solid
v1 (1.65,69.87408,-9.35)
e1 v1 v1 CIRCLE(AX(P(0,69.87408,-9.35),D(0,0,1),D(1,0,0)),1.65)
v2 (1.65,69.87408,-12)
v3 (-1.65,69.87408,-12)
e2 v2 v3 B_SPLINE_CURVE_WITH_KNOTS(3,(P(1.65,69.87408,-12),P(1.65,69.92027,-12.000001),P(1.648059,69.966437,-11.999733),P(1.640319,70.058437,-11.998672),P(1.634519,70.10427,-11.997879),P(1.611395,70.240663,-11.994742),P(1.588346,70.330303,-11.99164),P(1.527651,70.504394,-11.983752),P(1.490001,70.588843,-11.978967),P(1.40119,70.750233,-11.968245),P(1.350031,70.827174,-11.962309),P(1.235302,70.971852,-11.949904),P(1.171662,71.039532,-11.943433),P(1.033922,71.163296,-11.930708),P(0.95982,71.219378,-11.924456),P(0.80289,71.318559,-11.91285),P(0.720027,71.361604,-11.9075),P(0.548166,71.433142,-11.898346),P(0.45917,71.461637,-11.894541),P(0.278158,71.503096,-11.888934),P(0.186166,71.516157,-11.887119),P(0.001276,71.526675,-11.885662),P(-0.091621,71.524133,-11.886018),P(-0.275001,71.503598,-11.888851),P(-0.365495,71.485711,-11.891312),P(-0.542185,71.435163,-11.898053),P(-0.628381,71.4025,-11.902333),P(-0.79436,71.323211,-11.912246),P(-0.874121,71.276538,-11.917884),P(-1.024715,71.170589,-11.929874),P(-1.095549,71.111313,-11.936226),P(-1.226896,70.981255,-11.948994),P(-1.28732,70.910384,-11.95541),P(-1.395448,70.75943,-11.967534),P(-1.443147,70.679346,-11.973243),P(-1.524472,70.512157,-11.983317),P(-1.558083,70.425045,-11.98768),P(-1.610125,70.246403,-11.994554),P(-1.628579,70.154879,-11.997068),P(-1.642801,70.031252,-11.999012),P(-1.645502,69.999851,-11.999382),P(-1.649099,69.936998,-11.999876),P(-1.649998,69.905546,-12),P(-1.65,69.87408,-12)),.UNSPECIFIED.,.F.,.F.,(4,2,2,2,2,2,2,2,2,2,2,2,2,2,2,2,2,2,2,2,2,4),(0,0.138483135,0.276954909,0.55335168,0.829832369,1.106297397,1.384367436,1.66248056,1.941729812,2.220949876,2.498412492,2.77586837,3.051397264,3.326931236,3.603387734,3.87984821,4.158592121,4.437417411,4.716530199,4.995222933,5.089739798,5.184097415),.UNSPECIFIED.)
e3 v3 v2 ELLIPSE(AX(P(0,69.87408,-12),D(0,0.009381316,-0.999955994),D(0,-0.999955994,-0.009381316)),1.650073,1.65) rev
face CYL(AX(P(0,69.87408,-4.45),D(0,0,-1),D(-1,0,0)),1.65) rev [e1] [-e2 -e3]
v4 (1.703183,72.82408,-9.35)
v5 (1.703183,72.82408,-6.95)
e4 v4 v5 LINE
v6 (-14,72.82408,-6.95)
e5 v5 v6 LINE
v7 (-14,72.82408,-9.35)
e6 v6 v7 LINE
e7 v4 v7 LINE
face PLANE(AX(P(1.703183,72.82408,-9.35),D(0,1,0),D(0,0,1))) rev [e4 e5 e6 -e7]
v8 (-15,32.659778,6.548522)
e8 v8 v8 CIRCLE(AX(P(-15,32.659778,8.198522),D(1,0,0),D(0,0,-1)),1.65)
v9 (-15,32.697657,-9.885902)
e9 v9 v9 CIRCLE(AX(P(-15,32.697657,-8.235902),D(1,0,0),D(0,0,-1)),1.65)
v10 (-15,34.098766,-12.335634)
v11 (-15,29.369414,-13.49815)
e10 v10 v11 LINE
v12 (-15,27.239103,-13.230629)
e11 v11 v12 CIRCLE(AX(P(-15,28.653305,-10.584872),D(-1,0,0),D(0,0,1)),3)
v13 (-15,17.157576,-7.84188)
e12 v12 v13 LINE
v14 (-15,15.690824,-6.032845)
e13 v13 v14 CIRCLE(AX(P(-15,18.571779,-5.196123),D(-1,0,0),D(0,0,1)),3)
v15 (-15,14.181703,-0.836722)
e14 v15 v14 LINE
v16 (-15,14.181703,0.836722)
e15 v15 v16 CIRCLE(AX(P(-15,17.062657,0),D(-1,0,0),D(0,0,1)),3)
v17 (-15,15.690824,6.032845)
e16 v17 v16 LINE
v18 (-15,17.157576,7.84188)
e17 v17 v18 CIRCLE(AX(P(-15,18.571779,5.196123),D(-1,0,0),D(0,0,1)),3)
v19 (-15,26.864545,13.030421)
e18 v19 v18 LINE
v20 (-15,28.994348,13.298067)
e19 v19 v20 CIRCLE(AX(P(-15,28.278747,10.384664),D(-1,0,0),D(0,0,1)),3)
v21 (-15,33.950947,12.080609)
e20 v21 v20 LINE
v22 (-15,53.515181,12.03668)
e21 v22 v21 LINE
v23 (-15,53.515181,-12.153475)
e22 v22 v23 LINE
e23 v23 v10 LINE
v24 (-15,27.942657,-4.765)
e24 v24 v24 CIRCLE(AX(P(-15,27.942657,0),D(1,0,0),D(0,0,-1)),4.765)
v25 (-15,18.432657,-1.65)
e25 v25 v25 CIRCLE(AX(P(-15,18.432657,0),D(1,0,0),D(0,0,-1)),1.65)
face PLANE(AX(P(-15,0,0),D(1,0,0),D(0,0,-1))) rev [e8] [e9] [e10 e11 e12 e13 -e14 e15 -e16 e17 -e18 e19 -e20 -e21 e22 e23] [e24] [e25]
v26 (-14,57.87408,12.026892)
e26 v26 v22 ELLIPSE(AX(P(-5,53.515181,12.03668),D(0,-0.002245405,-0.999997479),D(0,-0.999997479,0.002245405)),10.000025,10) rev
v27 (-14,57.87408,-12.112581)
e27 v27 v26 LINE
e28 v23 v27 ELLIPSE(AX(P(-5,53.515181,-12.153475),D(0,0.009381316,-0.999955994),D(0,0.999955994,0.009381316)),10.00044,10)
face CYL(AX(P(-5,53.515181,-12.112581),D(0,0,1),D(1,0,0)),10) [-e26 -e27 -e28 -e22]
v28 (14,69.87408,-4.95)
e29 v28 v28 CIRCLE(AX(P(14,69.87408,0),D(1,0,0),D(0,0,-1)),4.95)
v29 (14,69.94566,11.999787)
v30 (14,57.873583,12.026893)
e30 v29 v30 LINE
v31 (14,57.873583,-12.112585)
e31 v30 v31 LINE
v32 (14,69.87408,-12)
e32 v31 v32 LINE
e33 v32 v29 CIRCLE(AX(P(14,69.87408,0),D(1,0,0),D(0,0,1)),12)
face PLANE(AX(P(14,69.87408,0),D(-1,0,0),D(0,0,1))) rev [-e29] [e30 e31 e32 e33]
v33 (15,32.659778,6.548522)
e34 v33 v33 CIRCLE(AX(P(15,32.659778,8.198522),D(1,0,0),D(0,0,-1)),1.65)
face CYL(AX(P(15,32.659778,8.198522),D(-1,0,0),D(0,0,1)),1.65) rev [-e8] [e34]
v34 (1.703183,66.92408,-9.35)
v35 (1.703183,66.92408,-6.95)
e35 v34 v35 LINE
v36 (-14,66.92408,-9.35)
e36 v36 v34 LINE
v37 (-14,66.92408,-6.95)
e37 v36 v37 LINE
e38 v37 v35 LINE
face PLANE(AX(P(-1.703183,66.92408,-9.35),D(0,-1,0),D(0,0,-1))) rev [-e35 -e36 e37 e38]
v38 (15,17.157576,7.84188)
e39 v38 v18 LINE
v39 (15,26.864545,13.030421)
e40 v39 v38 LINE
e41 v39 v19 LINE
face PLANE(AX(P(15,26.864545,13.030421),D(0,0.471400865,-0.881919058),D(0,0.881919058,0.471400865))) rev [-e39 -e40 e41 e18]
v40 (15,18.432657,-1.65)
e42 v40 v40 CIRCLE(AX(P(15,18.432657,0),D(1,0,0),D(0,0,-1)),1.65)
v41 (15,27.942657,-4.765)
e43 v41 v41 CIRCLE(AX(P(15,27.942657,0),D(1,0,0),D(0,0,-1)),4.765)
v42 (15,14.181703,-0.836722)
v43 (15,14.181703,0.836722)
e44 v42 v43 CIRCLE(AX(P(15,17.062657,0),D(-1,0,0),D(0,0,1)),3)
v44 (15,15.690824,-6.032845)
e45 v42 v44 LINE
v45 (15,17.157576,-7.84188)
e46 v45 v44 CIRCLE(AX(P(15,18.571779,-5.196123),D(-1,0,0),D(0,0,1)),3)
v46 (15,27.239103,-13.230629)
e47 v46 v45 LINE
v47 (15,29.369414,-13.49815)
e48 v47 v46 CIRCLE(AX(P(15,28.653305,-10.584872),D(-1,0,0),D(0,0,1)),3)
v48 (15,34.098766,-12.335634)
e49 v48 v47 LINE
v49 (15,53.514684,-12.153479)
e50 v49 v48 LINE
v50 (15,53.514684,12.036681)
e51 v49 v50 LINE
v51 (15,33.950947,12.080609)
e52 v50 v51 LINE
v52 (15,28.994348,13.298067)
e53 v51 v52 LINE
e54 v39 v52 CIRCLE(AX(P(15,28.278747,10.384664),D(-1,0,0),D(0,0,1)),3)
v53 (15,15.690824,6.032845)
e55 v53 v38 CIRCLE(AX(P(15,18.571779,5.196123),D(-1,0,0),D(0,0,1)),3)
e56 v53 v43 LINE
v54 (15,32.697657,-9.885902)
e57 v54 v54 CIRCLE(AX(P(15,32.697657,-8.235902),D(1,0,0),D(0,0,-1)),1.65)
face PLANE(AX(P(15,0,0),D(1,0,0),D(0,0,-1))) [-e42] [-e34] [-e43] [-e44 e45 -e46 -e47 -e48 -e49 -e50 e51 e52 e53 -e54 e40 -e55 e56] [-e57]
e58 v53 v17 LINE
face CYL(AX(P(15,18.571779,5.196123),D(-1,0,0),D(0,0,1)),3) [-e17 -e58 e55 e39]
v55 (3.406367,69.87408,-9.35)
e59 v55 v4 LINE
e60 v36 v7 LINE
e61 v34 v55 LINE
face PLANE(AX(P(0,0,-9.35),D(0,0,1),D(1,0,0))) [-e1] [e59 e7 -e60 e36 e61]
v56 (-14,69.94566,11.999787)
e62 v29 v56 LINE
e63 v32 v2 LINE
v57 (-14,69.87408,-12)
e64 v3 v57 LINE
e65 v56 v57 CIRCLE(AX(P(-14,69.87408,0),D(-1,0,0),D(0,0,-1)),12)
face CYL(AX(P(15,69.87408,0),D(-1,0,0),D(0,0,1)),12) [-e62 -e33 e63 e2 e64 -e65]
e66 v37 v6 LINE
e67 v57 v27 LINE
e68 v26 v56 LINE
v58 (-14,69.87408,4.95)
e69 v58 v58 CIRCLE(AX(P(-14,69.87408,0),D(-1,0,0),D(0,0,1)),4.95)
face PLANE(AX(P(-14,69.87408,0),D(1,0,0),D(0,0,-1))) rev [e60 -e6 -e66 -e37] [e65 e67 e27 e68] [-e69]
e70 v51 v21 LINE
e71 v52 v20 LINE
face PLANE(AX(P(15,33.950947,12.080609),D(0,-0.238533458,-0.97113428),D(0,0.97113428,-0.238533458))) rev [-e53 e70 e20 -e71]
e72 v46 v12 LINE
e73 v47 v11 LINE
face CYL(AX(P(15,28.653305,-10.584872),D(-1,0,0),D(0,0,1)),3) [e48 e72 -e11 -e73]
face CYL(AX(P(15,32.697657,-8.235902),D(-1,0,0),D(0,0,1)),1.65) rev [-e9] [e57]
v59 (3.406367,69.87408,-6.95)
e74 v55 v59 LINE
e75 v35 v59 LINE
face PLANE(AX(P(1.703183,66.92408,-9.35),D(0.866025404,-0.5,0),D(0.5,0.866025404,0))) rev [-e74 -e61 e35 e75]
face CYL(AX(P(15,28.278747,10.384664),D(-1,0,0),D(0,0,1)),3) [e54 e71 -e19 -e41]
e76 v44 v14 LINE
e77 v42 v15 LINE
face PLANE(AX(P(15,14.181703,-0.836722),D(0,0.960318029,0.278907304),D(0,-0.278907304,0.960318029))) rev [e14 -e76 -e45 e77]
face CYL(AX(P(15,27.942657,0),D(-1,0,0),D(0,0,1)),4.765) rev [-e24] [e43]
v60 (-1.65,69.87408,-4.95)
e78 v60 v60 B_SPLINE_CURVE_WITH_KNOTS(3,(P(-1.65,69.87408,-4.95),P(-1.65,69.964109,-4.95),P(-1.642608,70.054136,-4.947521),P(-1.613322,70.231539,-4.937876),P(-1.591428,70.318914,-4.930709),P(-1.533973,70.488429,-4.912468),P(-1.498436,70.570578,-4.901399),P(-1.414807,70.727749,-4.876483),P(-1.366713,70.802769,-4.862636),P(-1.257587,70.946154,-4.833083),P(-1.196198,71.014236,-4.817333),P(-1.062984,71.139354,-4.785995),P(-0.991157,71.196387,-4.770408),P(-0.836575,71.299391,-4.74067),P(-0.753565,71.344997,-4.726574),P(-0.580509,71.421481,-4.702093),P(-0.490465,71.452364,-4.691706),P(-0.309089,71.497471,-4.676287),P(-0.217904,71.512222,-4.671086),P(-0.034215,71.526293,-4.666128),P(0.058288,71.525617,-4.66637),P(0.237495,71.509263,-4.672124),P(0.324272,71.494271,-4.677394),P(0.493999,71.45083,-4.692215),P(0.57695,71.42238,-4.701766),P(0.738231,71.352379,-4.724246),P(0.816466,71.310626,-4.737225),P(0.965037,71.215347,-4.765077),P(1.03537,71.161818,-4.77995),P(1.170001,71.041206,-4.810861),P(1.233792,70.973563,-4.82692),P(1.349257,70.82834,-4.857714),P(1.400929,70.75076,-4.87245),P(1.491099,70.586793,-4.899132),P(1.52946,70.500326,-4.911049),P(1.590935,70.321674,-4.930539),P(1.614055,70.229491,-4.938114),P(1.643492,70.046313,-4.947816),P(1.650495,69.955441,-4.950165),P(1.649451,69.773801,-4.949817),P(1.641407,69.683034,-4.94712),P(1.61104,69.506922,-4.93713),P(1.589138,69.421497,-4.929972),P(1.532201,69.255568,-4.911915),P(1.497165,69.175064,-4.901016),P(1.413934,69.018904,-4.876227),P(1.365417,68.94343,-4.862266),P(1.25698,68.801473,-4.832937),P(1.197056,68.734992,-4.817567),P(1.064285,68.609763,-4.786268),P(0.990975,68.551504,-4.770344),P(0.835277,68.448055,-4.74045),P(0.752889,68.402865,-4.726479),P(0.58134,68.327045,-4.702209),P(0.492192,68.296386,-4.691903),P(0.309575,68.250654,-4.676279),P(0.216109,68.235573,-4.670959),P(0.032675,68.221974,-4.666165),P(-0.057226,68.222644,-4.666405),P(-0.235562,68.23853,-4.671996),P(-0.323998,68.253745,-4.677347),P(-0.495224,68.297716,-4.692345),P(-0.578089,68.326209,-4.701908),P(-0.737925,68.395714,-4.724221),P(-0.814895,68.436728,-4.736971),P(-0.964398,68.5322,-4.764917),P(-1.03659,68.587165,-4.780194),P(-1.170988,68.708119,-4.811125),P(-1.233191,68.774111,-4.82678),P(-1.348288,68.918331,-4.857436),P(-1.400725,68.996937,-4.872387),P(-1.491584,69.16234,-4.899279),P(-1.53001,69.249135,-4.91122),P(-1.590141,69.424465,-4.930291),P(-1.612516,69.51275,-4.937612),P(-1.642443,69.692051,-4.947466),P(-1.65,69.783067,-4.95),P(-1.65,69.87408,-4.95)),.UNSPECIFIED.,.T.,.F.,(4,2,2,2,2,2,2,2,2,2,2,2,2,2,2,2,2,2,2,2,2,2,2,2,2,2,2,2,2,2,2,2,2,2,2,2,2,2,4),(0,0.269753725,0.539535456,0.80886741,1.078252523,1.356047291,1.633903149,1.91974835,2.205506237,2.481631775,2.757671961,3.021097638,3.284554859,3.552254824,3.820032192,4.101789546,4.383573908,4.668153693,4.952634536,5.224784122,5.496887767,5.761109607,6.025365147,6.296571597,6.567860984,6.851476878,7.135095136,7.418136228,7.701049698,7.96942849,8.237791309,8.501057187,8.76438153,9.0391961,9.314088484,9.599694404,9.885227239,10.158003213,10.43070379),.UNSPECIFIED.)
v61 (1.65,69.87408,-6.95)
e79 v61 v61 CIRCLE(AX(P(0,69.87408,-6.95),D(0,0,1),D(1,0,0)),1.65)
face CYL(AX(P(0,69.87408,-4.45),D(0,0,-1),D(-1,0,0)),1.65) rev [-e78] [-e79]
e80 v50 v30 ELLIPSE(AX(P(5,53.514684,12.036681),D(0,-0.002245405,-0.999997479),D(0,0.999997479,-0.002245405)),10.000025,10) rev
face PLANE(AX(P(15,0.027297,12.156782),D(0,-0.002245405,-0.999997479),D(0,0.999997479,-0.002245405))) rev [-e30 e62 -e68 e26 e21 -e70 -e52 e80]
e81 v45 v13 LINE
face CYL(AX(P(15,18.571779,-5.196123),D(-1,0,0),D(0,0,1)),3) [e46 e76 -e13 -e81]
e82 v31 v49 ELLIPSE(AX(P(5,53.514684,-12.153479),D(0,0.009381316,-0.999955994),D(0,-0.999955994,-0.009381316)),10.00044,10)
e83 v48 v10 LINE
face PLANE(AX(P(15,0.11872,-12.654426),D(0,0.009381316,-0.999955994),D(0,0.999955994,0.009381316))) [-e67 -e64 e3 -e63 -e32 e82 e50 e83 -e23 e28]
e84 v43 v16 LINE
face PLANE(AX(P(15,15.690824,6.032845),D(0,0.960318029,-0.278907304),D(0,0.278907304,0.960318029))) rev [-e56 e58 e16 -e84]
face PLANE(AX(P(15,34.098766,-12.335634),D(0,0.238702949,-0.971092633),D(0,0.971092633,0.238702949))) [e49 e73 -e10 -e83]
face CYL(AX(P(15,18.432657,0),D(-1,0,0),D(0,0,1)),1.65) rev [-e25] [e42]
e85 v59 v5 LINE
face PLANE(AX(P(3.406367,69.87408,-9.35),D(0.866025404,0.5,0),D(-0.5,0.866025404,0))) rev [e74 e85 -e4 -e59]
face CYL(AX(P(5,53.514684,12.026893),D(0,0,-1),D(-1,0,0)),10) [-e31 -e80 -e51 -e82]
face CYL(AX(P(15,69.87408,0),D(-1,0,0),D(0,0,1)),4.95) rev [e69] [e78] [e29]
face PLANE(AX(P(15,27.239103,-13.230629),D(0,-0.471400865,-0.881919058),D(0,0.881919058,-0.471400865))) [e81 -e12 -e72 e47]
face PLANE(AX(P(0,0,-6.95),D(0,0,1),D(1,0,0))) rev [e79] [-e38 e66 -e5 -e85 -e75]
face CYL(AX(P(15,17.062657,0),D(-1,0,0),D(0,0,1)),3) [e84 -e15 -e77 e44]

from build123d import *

# Parameters (mm, degrees)
SKETCH3_R                = 4.764999999999999
SKETCH3_R_2              = 1.6499999999999995
SKETCH3_R_3              = 1.6500000000000001
SKETCH3_R_4              = 4.949999999999999
BOSS_EXTRUDE1_DEPTH      = 15
CUT_EXTRUDE2_START       = -13.584871855
CUT_EXTRUDE2_DEPTH       = 26.96953595
CUT_EXTRUDE2_START_2     = -9.35
CUT_EXTRUDE2_2_DEPTH     = 2.4
CUT_EXTRUDE2_START_3     = -12.112585404
CUT_EXTRUDE2_3_OUTLINE_R = 1.65
CUT_EXTRUDE2_3_DEPTH     = 7.445675888


with BuildPart() as part:
    # Sketch3 → Boss-Extrude1 (new, symmetric)
    with BuildSketch(Plane(origin=(0, 0, 0), x_dir=(0, 0, -1), z_dir=(1, 0, 0))):
        with BuildLine():
            Line((0.8367219106320328, 14.181702950289672), (6.032844785264023, 15.69082448784832))
            ThreePointArc((6.032844785264023, 15.69082448784832), (7.085502436432338, 16.24148999245743), (7.8418800486349785, 17.15757597984521))
            Line((7.8418800486349785, 17.15757597984521), (13.230629028910363, 27.2391027259585))
            ThreePointArc((13.230629028910363, 27.2391027259585), (13.56149316864207, 28.279506504021278), (13.498149754436925, 29.369414166277377))
            Line((13.498149754436925, 29.369414166277377), (12.335634292704244, 34.09876588260545))
            Line((12.335634292704244, 34.09876588260545), (12, 69.874079866702))
            ThreePointArc((12, 69.874079866702), (0.03578997764799362, 81.87402649481248), (-11.999786512916659, 69.94565950363487))
            Line((-11.999786512916659, 69.94565950363487), (-12.080609434266979, 33.95094660386098))
            Line((-12.080609434266979, 33.95094660386098), (-13.298066935132345, 28.994347536270237))
            ThreePointArc((-13.298066935132345, 28.994347536270237), (-13.361252777703697, 27.904688590043286), (-13.030421269406453, 26.864544569769336))
            Line((-13.030421269406453, 26.864544569769336), (-7.841880048634967, 17.157575979845202))
            ThreePointArc((-7.841880048634967, 17.157575979845202), (-7.085502436432326, 16.24148999245743), (-6.032844785264015, 15.690824487848316))
            Line((-6.032844785264015, 15.690824487848316), (-0.8367219106320335, 14.18170295028967))
            ThreePointArc((-0.8367219106320335, 14.18170295028967), (1.8e-16, 14.062657036051588), (0.8367219106320328, 14.181702950289672))
        make_face()
        with Locations((1.16e-15, 27.94265703605159)):
            Circle(SKETCH3_R, mode=Mode.SUBTRACT)
        with Locations((0, 18.43265703605159)):
            Circle(SKETCH3_R_2, mode=Mode.SUBTRACT)
        with Locations((8.23590158999005, 32.69765703605151)):
            Circle(SKETCH3_R_3, mode=Mode.SUBTRACT)
        with Locations((-8.19852155344579, 32.659777731318925)):
            Circle(SKETCH3_R_3, mode=Mode.SUBTRACT)
        with Locations((0, 69.874079866702)):
            Circle(SKETCH3_R_4, mode=Mode.SUBTRACT)
    extrude(amount=BOSS_EXTRUDE1_DEPTH, both=True)

    # Cut-Extrude2: read off the stored shape, not the designer's step
    # Cut-Extrude2 outline → Cut-Extrude2 (cut)
    with BuildSketch(Plane.XY.offset(CUT_EXTRUDE2_START)):
        with BuildLine():
            ThreePointArc((-15, 53.515180923), (-14.746794345, 55.751248901), (-14, 57.874079867))
            Line((-14, 57.874079867), (-14, 83))
            Line((-14, 83), (-15, 83))
            Line((-15, 83), (-15, 53.515180923))
        make_face()
        with BuildLine():
            Line((15, 83), (14, 83))
            Line((14, 83), (14, 57.873583349))
            ThreePointArc((14, 57.873583349), (14.746794345, 55.750752383), (15, 53.514684405))
            Line((15, 53.514684405), (15, 83))
        make_face()
    extrude(amount=CUT_EXTRUDE2_DEPTH, mode=Mode.SUBTRACT)

    # Cut-Extrude2 2 outline → Cut-Extrude2 2 (cut)
    with BuildSketch(Plane.XY.offset(CUT_EXTRUDE2_START_2)):
        Polygon((-14, 66.924079867), (1.703183294, 66.924079867), (3.406366588, 69.874079867), (1.703183294, 72.824079867), (-14, 72.824079867), align=None)
    extrude(amount=CUT_EXTRUDE2_2_DEPTH, mode=Mode.SUBTRACT)

    # Cut-Extrude2 3 outline → Cut-Extrude2 3 (cut)
    with BuildSketch(Plane.XY.offset(CUT_EXTRUDE2_START_3)):
        with Locations((0, 69.874079867)):
            Circle(CUT_EXTRUDE2_3_OUTLINE_R)
    extrude(amount=CUT_EXTRUDE2_3_DEPTH, mode=Mode.SUBTRACT)


solid = part.part
